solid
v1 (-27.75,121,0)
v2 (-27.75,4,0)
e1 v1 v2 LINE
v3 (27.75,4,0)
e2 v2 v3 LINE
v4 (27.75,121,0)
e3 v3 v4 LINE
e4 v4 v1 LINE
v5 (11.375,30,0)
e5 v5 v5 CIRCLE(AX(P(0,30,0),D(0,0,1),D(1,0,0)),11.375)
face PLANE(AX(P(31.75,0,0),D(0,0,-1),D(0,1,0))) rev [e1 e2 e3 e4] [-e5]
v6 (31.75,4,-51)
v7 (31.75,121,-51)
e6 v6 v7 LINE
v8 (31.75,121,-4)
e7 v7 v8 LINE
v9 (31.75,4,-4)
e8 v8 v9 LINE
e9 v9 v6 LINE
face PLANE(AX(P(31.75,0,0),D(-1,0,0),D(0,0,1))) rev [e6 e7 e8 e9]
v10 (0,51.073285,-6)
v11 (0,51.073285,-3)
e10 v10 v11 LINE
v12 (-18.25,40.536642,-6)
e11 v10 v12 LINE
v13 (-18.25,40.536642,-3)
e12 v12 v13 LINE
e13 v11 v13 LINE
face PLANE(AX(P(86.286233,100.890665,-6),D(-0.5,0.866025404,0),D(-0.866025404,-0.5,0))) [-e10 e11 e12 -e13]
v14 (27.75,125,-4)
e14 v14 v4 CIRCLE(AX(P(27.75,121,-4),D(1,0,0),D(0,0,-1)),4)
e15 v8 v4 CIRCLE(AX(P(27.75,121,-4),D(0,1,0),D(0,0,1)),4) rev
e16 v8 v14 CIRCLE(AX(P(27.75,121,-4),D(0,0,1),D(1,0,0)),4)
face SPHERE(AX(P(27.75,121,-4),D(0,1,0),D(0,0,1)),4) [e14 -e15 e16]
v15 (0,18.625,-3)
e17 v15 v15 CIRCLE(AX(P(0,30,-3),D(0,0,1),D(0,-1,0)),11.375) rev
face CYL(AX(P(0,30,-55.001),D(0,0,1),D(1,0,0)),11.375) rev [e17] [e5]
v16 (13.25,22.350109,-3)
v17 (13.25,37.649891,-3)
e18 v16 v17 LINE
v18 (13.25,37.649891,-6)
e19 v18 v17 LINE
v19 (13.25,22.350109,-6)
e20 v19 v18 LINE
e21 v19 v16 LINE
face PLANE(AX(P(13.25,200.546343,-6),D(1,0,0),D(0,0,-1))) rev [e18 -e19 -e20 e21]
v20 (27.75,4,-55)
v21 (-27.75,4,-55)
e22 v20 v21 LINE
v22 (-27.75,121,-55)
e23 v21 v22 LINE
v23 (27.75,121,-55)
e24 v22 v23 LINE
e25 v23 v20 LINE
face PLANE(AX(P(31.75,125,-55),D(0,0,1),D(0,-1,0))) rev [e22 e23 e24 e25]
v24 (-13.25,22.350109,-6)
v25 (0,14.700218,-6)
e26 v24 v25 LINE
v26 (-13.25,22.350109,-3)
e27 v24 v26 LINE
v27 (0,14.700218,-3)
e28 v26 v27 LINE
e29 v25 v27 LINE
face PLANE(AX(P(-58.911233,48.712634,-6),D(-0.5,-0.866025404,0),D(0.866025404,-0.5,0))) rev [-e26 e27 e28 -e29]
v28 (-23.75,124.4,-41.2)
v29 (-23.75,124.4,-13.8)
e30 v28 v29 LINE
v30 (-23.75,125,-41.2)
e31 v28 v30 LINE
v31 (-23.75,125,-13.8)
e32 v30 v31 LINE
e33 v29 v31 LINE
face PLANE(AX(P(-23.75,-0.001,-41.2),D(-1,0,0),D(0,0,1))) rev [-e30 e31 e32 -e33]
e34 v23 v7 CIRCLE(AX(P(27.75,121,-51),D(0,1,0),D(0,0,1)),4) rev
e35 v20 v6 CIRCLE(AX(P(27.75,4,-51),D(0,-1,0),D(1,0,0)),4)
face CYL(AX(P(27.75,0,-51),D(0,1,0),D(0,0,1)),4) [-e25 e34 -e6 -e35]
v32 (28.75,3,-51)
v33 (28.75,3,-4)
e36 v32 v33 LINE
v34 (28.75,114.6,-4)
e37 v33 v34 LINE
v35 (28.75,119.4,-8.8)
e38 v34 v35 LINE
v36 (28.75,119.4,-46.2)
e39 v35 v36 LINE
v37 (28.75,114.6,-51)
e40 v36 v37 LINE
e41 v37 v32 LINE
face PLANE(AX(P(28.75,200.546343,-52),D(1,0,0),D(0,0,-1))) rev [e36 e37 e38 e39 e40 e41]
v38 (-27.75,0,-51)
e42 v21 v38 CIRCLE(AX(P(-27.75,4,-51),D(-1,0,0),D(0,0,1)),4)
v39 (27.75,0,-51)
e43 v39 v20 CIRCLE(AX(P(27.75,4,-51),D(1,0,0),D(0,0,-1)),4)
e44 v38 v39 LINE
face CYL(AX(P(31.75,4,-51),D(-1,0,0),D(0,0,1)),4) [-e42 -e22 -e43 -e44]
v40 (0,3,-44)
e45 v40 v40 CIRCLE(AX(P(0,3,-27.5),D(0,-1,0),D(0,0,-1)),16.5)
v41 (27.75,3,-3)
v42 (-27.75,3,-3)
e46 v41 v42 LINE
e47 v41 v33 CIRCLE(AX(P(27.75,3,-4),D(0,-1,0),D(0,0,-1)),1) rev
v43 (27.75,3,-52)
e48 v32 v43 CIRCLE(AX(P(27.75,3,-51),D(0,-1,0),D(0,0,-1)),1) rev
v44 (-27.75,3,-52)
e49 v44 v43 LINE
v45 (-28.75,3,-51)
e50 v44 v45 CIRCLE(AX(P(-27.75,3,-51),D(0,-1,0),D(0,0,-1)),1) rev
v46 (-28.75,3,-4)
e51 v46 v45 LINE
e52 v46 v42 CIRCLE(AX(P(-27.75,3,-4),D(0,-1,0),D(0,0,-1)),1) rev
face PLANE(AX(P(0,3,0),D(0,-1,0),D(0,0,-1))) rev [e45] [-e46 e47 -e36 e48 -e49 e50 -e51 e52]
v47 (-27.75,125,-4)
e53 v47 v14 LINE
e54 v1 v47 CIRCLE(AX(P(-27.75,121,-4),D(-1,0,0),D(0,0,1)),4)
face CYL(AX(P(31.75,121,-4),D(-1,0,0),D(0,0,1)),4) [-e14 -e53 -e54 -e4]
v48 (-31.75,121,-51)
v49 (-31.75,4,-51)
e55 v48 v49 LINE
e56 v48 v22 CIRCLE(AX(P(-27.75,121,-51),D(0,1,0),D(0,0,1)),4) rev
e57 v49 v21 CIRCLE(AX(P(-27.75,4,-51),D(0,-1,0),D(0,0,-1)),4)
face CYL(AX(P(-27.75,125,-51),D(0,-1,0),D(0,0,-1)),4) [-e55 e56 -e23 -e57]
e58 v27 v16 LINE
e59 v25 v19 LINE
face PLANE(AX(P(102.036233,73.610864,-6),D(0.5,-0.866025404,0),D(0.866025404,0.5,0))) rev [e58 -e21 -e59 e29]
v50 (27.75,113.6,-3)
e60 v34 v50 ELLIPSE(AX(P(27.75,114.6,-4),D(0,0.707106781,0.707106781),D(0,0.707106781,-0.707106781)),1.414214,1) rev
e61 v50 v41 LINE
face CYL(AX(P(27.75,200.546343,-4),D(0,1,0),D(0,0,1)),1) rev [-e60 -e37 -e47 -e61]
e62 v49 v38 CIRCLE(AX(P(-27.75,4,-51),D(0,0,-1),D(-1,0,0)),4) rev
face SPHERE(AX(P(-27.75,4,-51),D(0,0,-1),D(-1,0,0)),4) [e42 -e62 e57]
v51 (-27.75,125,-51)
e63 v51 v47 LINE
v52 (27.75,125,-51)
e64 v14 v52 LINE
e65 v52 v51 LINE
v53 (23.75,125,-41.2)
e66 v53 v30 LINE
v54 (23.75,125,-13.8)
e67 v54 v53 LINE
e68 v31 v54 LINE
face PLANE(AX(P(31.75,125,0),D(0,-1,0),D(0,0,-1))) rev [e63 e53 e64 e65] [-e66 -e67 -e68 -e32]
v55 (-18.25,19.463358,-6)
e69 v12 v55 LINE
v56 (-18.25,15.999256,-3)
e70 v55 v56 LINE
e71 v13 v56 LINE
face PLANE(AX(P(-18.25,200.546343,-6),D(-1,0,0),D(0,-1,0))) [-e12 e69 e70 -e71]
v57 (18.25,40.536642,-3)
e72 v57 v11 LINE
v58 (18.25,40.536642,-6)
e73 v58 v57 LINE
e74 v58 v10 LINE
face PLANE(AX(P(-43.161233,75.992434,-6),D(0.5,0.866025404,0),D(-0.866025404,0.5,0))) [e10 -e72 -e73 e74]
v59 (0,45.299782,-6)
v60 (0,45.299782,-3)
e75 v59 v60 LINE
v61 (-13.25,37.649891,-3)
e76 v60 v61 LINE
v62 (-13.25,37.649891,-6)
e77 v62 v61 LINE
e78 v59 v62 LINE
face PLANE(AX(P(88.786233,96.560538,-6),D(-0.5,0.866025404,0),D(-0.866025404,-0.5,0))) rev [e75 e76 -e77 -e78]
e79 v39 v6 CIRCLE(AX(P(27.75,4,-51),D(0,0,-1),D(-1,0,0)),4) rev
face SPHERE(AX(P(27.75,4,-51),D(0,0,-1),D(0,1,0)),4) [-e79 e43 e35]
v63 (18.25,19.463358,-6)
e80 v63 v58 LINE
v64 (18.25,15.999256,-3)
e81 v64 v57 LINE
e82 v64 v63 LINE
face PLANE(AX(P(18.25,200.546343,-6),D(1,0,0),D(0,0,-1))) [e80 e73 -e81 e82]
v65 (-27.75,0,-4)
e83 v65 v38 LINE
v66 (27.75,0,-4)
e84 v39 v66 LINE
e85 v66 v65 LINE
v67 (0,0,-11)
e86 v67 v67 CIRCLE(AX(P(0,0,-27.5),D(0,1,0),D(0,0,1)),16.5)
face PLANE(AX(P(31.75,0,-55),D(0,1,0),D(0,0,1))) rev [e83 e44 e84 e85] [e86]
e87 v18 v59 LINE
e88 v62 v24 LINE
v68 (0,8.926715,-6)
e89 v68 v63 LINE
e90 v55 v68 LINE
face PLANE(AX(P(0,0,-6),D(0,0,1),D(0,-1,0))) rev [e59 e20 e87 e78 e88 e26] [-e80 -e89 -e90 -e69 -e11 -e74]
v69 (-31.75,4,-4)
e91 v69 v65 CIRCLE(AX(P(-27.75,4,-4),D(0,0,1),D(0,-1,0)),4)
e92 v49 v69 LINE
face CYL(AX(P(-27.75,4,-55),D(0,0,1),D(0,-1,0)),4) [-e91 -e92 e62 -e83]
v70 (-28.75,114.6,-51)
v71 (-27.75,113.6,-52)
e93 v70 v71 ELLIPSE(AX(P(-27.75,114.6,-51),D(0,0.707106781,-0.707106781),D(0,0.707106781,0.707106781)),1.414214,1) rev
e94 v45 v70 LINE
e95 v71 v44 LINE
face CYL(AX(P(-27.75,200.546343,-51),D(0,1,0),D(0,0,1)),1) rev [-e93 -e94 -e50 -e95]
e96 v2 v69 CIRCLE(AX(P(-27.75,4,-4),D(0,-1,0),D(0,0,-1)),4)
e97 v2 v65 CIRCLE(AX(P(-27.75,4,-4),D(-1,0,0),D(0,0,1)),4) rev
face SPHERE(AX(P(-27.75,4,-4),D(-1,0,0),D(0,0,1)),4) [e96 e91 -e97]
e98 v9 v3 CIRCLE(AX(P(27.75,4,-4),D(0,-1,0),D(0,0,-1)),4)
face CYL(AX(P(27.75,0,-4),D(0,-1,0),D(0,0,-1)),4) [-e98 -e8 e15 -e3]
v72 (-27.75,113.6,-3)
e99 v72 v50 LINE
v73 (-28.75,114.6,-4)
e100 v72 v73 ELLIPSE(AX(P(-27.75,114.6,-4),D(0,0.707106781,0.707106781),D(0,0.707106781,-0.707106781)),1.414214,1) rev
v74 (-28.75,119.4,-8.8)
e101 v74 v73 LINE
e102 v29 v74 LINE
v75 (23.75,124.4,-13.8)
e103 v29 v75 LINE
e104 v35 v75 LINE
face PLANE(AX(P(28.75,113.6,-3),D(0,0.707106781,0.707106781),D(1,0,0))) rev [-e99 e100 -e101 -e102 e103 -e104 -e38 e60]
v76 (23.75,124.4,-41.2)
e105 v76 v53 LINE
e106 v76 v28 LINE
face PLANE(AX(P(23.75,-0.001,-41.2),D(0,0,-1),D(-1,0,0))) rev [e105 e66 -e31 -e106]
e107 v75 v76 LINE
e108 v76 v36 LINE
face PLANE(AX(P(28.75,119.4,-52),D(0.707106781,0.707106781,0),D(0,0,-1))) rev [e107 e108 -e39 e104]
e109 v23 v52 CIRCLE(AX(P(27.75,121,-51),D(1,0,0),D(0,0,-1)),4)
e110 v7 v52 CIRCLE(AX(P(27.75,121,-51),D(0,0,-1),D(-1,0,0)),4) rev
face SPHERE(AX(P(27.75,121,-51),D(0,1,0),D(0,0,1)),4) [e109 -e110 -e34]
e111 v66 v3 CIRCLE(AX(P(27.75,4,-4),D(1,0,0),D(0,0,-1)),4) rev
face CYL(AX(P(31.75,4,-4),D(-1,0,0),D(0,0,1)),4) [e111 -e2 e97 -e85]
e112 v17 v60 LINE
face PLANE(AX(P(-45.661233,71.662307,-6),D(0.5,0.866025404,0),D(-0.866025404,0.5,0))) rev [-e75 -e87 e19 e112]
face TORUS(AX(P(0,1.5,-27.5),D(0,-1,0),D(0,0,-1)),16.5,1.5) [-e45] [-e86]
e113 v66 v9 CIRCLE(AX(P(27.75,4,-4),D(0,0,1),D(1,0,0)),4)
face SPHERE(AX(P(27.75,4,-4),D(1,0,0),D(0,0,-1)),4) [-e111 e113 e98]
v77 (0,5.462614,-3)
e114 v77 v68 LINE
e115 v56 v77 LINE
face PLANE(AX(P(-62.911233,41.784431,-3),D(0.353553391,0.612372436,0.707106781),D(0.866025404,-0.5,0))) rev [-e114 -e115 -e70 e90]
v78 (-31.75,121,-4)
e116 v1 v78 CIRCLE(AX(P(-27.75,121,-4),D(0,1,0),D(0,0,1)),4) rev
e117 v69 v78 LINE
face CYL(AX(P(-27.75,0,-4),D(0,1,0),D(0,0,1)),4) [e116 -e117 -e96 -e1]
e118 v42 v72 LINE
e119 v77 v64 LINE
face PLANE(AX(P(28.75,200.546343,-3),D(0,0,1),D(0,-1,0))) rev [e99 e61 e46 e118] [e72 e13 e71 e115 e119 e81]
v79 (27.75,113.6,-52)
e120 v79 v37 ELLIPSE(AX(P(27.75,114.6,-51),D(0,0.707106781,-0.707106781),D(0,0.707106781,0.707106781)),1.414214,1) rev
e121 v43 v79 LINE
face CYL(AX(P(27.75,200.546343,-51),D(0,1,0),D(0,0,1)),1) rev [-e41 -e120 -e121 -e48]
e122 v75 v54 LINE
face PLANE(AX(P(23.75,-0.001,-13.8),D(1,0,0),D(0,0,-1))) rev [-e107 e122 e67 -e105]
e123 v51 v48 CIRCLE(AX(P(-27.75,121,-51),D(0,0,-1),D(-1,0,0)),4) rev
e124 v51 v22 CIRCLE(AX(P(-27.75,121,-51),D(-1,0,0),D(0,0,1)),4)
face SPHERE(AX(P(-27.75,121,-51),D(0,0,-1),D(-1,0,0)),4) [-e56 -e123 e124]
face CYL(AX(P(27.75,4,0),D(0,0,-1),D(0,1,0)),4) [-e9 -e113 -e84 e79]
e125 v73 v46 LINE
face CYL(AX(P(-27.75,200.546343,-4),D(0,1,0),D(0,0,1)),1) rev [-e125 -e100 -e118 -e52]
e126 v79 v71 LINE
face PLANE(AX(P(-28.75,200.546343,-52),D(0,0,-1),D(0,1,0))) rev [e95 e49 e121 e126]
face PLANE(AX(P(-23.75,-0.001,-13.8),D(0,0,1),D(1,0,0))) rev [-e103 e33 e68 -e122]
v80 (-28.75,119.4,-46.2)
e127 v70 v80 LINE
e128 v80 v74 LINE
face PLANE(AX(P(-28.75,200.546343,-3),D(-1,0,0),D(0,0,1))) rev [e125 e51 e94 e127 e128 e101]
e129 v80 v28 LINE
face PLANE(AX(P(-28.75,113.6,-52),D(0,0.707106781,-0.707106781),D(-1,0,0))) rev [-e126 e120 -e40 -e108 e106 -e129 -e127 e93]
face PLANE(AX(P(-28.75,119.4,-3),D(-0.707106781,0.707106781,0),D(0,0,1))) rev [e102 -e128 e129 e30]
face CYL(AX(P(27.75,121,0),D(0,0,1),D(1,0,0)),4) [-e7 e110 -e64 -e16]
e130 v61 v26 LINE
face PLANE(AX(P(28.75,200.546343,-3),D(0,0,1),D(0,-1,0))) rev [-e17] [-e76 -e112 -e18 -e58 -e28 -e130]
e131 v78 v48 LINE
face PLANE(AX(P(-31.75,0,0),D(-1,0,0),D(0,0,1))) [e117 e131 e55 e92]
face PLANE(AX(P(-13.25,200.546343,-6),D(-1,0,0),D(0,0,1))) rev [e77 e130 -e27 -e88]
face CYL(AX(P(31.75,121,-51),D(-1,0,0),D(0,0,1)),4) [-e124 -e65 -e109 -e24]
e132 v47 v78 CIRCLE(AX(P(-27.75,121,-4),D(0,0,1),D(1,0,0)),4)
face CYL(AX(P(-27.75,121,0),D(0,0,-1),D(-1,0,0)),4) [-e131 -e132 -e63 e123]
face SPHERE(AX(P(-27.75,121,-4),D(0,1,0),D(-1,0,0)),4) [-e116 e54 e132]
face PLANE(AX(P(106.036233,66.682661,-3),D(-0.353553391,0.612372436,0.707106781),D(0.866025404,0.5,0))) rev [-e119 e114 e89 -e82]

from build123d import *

# Parameters (mm, degrees)
PROFILE_SKETCH_W                         = 55
PROFILE_SKETCH_H                         = 125
PROFILE_EXTRUDE_DEPTH                    = 31.75
INTERIOR_START                           = -3
INTERIOR_SKETCH_W                        = 57.5
INTERIOR_SKETCH_H                        = 49
INTERIOR_CUT_DEPTH                       = 121.4
POWER_SWITCH_OPENING_CUT_REACH           = 142.207
OPENING_SKETCH_W                         = 47.5
OPENING_SKETCH_H                         = 27.4
INSIDE_TOP_CHAMFER_1_SIZE                = 5
INSIDE_TOP_CHAMFER_2_SIZE                = 10.8
STOP_BUTTON_HOLE_CUT_REACH               = 142.207
STOP_BUTTON_HOLE_SKETCH_R                = 11.375
NUT_START                                = -3
NUT_RECESS_EXTRUDE_DEPTH                 = 3
INSIDE_FILLETS_R                         = 1
WIRE_OUTLET_CUT_REACH                    = 142.207
WIRE_OUTLET_CUT_SKETCH_R                 = 15
NUT_RECESS_CHAMFER_FOR_PRINTABILITY_SIZE = 3
WIRE_OUTLET_FILLET_R                     = 1.5
TOP_FILLETS_R                            = 4


# Some blends are built 0.0001 mm under size
with BuildPart() as part:
    # Profile Sketch → Profile Extrude (new, symmetric)
    with BuildSketch(Plane(origin=(0, 0, 0), x_dir=(0, 0, -1), z_dir=(1, 0, 0))):
        with Locations((27.5, 62.5)):
            Rectangle(PROFILE_SKETCH_W, PROFILE_SKETCH_H)
    extrude(amount=PROFILE_EXTRUDE_DEPTH, both=True)

    # Interior Sketch → Interior Cut (cut)
    with BuildSketch(Plane.XZ.offset(INTERIOR_START)):
        with Locations((0, -27.5)):
            Rectangle(INTERIOR_SKETCH_W, INTERIOR_SKETCH_H)
    extrude(amount=-INTERIOR_CUT_DEPTH, mode=Mode.SUBTRACT)

    # Opening Sketch → Power Switch Opening Cut (cut, up to next)
    with BuildSketch(Plane(origin=(0, 125, 0), x_dir=(1, 0, 0), z_dir=(0, 1, 0)), mode=Mode.PRIVATE) as power_switch_opening_cut_sk1:
        with Locations((0, 27.5)):
            Rectangle(OPENING_SKETCH_W, OPENING_SKETCH_H)
    power_switch_opening_cut_tool1 = extrude(power_switch_opening_cut_sk1.sketch, amount=-POWER_SWITCH_OPENING_CUT_REACH, mode=Mode.PRIVATE) & part.part
    add(power_switch_opening_cut_tool1.solids().sort_by_distance((0, 125, -27.5))[0], mode=Mode.SUBTRACT)

    # Inside Top Chamfer 1
    # the kernel refuses this chamfer: 5 mm, written as the material it adds along each edge
    with BuildSketch(Plane(origin=(28.75, 124.4, -52), x_dir=(-0.9996219169112968, 0.0274958766105877, 0), z_dir=(0, 0, 1)), Plane(origin=(-28.75, 124.4, -3), x_dir=(0.9996219169112968, 0.0274958766105877, 0), z_dir=(0, 0, -1))) as inside_top_chamfer_1_piece_1:
        Polygon((INSIDE_TOP_CHAMFER_1_SIZE * 0.999621916911, INSIDE_TOP_CHAMFER_1_SIZE * 0.0274958766106), (-INSIDE_TOP_CHAMFER_1_SIZE * 0.0274958766106, INSIDE_TOP_CHAMFER_1_SIZE * 0.999621916911), (0, 0), align=None)
    extrude(amount=49)

    # Inside Top Chamfer 2
    inside_top_chamfer_2_edges = [part.edges().sort_by_distance(p)[0] for p in [
        (0, 124.4, -52),
        (0, 124.4, -3),
    ]]
    chamfer(inside_top_chamfer_2_edges, length=INSIDE_TOP_CHAMFER_2_SIZE - 0.0001)  # a hair under: the kernel refuses the full size

    # Stop Button Hole Sketch → Stop Button Hole Cut (cut, up to next)
    with BuildSketch(Plane.XY, mode=Mode.PRIVATE) as stop_button_hole_cut_sk1:
        with Locations((0, 30)):
            Circle(STOP_BUTTON_HOLE_SKETCH_R)
    stop_button_hole_cut_tool1 = extrude(stop_button_hole_cut_sk1.sketch, amount=-STOP_BUTTON_HOLE_CUT_REACH, mode=Mode.PRIVATE) & part.part
    add(stop_button_hole_cut_tool1.solids().sort_by_distance((0, 30, 0))[0], mode=Mode.SUBTRACT)

    # Stop Button Nut Sketch → Nut Recess Extrude (add)
    with BuildSketch(Plane.XY.offset(NUT_START)):
        Polygon((0, 8.926715175), (18.25, 19.463357587), (18.25, 40.536642413), (0, 51.073284825), (-18.25, 40.536642413), (-18.25, 19.463357587), align=None)
        Polygon((-13.25, 22.350108933), (0, 14.700217866), (13.25, 22.350108933), (13.25, 37.649891067), (0, 45.299782134), (-13.25, 37.649891067), align=None, mode=Mode.SUBTRACT)
    extrude(amount=-NUT_RECESS_EXTRUDE_DEPTH)

    # Inside Fillets
    inside_fillets_edges = [part.edges().sort_by_distance(p)[0] for p in [
        (28.75, 58.30005, -52),
        (-28.75, 58.30005, -52),
        (-28.75, 58.30005, -3),
        (28.75, 58.30005, -3),
    ]]
    fillet(inside_fillets_edges, radius=INSIDE_FILLETS_R)

    # Wire Outlet Cut Sketch → Wire Outlet Cut (cut, up to next)
    with BuildSketch(Plane.XZ, mode=Mode.PRIVATE) as wire_outlet_cut_sk1:
        with Locations(Location((0, -27.5, 0), (0, 0, 270))):
            Circle(WIRE_OUTLET_CUT_SKETCH_R)
    wire_outlet_cut_tool1 = extrude(wire_outlet_cut_sk1.sketch, amount=-WIRE_OUTLET_CUT_REACH, mode=Mode.PRIVATE) & part.part
    add(wire_outlet_cut_tool1.solids().sort_by_distance((0, 0, -27.5))[0], mode=Mode.SUBTRACT)

    # Nut Recess Chamfer for Printability
    nut_recess_chamfer_for_printability_edges = [part.edges().sort_by_distance(p)[0] for p in [
        (9.125, 14.195036381, -3),
        (-9.125, 14.195036381, -3),
    ]]
    chamfer(nut_recess_chamfer_for_printability_edges, length=NUT_RECESS_CHAMFER_FOR_PRINTABILITY_SIZE - 0.0001)  # a hair under: the kernel refuses the full size

    # Wire Outlet Fillet
    wire_outlet_fillet_edges = [part.edges().sort_by_distance(p)[0] for p in [
        (0, 0, -12.5),
        (0, 3, -12.5),
    ]]
    fillet(wire_outlet_fillet_edges, radius=WIRE_OUTLET_FILLET_R - 0.0001)  # a hair under: the kernel refuses the full size

    # Top Fillets
    top_fillets_edges = [part.edges().sort_by_distance(p)[0] for p in [
        (31.75, 125, -27.5),
        (31.75, 62.5, 0),
        (31.75, 0, -27.5),
        (-31.75, 62.5, 0),
        (-31.75, 125, -27.5),
        (-31.75, 62.5, -55),
        (-31.75, 0, -27.5),
        (0, 0, 0),
        (0, 125, 0),
        (0, 125, -55),
        (0, 0, -55),
        (31.75, 62.5, -55),
    ]]
    fillet(top_fillets_edges, radius=TOP_FILLETS_R)


solid = part.part
